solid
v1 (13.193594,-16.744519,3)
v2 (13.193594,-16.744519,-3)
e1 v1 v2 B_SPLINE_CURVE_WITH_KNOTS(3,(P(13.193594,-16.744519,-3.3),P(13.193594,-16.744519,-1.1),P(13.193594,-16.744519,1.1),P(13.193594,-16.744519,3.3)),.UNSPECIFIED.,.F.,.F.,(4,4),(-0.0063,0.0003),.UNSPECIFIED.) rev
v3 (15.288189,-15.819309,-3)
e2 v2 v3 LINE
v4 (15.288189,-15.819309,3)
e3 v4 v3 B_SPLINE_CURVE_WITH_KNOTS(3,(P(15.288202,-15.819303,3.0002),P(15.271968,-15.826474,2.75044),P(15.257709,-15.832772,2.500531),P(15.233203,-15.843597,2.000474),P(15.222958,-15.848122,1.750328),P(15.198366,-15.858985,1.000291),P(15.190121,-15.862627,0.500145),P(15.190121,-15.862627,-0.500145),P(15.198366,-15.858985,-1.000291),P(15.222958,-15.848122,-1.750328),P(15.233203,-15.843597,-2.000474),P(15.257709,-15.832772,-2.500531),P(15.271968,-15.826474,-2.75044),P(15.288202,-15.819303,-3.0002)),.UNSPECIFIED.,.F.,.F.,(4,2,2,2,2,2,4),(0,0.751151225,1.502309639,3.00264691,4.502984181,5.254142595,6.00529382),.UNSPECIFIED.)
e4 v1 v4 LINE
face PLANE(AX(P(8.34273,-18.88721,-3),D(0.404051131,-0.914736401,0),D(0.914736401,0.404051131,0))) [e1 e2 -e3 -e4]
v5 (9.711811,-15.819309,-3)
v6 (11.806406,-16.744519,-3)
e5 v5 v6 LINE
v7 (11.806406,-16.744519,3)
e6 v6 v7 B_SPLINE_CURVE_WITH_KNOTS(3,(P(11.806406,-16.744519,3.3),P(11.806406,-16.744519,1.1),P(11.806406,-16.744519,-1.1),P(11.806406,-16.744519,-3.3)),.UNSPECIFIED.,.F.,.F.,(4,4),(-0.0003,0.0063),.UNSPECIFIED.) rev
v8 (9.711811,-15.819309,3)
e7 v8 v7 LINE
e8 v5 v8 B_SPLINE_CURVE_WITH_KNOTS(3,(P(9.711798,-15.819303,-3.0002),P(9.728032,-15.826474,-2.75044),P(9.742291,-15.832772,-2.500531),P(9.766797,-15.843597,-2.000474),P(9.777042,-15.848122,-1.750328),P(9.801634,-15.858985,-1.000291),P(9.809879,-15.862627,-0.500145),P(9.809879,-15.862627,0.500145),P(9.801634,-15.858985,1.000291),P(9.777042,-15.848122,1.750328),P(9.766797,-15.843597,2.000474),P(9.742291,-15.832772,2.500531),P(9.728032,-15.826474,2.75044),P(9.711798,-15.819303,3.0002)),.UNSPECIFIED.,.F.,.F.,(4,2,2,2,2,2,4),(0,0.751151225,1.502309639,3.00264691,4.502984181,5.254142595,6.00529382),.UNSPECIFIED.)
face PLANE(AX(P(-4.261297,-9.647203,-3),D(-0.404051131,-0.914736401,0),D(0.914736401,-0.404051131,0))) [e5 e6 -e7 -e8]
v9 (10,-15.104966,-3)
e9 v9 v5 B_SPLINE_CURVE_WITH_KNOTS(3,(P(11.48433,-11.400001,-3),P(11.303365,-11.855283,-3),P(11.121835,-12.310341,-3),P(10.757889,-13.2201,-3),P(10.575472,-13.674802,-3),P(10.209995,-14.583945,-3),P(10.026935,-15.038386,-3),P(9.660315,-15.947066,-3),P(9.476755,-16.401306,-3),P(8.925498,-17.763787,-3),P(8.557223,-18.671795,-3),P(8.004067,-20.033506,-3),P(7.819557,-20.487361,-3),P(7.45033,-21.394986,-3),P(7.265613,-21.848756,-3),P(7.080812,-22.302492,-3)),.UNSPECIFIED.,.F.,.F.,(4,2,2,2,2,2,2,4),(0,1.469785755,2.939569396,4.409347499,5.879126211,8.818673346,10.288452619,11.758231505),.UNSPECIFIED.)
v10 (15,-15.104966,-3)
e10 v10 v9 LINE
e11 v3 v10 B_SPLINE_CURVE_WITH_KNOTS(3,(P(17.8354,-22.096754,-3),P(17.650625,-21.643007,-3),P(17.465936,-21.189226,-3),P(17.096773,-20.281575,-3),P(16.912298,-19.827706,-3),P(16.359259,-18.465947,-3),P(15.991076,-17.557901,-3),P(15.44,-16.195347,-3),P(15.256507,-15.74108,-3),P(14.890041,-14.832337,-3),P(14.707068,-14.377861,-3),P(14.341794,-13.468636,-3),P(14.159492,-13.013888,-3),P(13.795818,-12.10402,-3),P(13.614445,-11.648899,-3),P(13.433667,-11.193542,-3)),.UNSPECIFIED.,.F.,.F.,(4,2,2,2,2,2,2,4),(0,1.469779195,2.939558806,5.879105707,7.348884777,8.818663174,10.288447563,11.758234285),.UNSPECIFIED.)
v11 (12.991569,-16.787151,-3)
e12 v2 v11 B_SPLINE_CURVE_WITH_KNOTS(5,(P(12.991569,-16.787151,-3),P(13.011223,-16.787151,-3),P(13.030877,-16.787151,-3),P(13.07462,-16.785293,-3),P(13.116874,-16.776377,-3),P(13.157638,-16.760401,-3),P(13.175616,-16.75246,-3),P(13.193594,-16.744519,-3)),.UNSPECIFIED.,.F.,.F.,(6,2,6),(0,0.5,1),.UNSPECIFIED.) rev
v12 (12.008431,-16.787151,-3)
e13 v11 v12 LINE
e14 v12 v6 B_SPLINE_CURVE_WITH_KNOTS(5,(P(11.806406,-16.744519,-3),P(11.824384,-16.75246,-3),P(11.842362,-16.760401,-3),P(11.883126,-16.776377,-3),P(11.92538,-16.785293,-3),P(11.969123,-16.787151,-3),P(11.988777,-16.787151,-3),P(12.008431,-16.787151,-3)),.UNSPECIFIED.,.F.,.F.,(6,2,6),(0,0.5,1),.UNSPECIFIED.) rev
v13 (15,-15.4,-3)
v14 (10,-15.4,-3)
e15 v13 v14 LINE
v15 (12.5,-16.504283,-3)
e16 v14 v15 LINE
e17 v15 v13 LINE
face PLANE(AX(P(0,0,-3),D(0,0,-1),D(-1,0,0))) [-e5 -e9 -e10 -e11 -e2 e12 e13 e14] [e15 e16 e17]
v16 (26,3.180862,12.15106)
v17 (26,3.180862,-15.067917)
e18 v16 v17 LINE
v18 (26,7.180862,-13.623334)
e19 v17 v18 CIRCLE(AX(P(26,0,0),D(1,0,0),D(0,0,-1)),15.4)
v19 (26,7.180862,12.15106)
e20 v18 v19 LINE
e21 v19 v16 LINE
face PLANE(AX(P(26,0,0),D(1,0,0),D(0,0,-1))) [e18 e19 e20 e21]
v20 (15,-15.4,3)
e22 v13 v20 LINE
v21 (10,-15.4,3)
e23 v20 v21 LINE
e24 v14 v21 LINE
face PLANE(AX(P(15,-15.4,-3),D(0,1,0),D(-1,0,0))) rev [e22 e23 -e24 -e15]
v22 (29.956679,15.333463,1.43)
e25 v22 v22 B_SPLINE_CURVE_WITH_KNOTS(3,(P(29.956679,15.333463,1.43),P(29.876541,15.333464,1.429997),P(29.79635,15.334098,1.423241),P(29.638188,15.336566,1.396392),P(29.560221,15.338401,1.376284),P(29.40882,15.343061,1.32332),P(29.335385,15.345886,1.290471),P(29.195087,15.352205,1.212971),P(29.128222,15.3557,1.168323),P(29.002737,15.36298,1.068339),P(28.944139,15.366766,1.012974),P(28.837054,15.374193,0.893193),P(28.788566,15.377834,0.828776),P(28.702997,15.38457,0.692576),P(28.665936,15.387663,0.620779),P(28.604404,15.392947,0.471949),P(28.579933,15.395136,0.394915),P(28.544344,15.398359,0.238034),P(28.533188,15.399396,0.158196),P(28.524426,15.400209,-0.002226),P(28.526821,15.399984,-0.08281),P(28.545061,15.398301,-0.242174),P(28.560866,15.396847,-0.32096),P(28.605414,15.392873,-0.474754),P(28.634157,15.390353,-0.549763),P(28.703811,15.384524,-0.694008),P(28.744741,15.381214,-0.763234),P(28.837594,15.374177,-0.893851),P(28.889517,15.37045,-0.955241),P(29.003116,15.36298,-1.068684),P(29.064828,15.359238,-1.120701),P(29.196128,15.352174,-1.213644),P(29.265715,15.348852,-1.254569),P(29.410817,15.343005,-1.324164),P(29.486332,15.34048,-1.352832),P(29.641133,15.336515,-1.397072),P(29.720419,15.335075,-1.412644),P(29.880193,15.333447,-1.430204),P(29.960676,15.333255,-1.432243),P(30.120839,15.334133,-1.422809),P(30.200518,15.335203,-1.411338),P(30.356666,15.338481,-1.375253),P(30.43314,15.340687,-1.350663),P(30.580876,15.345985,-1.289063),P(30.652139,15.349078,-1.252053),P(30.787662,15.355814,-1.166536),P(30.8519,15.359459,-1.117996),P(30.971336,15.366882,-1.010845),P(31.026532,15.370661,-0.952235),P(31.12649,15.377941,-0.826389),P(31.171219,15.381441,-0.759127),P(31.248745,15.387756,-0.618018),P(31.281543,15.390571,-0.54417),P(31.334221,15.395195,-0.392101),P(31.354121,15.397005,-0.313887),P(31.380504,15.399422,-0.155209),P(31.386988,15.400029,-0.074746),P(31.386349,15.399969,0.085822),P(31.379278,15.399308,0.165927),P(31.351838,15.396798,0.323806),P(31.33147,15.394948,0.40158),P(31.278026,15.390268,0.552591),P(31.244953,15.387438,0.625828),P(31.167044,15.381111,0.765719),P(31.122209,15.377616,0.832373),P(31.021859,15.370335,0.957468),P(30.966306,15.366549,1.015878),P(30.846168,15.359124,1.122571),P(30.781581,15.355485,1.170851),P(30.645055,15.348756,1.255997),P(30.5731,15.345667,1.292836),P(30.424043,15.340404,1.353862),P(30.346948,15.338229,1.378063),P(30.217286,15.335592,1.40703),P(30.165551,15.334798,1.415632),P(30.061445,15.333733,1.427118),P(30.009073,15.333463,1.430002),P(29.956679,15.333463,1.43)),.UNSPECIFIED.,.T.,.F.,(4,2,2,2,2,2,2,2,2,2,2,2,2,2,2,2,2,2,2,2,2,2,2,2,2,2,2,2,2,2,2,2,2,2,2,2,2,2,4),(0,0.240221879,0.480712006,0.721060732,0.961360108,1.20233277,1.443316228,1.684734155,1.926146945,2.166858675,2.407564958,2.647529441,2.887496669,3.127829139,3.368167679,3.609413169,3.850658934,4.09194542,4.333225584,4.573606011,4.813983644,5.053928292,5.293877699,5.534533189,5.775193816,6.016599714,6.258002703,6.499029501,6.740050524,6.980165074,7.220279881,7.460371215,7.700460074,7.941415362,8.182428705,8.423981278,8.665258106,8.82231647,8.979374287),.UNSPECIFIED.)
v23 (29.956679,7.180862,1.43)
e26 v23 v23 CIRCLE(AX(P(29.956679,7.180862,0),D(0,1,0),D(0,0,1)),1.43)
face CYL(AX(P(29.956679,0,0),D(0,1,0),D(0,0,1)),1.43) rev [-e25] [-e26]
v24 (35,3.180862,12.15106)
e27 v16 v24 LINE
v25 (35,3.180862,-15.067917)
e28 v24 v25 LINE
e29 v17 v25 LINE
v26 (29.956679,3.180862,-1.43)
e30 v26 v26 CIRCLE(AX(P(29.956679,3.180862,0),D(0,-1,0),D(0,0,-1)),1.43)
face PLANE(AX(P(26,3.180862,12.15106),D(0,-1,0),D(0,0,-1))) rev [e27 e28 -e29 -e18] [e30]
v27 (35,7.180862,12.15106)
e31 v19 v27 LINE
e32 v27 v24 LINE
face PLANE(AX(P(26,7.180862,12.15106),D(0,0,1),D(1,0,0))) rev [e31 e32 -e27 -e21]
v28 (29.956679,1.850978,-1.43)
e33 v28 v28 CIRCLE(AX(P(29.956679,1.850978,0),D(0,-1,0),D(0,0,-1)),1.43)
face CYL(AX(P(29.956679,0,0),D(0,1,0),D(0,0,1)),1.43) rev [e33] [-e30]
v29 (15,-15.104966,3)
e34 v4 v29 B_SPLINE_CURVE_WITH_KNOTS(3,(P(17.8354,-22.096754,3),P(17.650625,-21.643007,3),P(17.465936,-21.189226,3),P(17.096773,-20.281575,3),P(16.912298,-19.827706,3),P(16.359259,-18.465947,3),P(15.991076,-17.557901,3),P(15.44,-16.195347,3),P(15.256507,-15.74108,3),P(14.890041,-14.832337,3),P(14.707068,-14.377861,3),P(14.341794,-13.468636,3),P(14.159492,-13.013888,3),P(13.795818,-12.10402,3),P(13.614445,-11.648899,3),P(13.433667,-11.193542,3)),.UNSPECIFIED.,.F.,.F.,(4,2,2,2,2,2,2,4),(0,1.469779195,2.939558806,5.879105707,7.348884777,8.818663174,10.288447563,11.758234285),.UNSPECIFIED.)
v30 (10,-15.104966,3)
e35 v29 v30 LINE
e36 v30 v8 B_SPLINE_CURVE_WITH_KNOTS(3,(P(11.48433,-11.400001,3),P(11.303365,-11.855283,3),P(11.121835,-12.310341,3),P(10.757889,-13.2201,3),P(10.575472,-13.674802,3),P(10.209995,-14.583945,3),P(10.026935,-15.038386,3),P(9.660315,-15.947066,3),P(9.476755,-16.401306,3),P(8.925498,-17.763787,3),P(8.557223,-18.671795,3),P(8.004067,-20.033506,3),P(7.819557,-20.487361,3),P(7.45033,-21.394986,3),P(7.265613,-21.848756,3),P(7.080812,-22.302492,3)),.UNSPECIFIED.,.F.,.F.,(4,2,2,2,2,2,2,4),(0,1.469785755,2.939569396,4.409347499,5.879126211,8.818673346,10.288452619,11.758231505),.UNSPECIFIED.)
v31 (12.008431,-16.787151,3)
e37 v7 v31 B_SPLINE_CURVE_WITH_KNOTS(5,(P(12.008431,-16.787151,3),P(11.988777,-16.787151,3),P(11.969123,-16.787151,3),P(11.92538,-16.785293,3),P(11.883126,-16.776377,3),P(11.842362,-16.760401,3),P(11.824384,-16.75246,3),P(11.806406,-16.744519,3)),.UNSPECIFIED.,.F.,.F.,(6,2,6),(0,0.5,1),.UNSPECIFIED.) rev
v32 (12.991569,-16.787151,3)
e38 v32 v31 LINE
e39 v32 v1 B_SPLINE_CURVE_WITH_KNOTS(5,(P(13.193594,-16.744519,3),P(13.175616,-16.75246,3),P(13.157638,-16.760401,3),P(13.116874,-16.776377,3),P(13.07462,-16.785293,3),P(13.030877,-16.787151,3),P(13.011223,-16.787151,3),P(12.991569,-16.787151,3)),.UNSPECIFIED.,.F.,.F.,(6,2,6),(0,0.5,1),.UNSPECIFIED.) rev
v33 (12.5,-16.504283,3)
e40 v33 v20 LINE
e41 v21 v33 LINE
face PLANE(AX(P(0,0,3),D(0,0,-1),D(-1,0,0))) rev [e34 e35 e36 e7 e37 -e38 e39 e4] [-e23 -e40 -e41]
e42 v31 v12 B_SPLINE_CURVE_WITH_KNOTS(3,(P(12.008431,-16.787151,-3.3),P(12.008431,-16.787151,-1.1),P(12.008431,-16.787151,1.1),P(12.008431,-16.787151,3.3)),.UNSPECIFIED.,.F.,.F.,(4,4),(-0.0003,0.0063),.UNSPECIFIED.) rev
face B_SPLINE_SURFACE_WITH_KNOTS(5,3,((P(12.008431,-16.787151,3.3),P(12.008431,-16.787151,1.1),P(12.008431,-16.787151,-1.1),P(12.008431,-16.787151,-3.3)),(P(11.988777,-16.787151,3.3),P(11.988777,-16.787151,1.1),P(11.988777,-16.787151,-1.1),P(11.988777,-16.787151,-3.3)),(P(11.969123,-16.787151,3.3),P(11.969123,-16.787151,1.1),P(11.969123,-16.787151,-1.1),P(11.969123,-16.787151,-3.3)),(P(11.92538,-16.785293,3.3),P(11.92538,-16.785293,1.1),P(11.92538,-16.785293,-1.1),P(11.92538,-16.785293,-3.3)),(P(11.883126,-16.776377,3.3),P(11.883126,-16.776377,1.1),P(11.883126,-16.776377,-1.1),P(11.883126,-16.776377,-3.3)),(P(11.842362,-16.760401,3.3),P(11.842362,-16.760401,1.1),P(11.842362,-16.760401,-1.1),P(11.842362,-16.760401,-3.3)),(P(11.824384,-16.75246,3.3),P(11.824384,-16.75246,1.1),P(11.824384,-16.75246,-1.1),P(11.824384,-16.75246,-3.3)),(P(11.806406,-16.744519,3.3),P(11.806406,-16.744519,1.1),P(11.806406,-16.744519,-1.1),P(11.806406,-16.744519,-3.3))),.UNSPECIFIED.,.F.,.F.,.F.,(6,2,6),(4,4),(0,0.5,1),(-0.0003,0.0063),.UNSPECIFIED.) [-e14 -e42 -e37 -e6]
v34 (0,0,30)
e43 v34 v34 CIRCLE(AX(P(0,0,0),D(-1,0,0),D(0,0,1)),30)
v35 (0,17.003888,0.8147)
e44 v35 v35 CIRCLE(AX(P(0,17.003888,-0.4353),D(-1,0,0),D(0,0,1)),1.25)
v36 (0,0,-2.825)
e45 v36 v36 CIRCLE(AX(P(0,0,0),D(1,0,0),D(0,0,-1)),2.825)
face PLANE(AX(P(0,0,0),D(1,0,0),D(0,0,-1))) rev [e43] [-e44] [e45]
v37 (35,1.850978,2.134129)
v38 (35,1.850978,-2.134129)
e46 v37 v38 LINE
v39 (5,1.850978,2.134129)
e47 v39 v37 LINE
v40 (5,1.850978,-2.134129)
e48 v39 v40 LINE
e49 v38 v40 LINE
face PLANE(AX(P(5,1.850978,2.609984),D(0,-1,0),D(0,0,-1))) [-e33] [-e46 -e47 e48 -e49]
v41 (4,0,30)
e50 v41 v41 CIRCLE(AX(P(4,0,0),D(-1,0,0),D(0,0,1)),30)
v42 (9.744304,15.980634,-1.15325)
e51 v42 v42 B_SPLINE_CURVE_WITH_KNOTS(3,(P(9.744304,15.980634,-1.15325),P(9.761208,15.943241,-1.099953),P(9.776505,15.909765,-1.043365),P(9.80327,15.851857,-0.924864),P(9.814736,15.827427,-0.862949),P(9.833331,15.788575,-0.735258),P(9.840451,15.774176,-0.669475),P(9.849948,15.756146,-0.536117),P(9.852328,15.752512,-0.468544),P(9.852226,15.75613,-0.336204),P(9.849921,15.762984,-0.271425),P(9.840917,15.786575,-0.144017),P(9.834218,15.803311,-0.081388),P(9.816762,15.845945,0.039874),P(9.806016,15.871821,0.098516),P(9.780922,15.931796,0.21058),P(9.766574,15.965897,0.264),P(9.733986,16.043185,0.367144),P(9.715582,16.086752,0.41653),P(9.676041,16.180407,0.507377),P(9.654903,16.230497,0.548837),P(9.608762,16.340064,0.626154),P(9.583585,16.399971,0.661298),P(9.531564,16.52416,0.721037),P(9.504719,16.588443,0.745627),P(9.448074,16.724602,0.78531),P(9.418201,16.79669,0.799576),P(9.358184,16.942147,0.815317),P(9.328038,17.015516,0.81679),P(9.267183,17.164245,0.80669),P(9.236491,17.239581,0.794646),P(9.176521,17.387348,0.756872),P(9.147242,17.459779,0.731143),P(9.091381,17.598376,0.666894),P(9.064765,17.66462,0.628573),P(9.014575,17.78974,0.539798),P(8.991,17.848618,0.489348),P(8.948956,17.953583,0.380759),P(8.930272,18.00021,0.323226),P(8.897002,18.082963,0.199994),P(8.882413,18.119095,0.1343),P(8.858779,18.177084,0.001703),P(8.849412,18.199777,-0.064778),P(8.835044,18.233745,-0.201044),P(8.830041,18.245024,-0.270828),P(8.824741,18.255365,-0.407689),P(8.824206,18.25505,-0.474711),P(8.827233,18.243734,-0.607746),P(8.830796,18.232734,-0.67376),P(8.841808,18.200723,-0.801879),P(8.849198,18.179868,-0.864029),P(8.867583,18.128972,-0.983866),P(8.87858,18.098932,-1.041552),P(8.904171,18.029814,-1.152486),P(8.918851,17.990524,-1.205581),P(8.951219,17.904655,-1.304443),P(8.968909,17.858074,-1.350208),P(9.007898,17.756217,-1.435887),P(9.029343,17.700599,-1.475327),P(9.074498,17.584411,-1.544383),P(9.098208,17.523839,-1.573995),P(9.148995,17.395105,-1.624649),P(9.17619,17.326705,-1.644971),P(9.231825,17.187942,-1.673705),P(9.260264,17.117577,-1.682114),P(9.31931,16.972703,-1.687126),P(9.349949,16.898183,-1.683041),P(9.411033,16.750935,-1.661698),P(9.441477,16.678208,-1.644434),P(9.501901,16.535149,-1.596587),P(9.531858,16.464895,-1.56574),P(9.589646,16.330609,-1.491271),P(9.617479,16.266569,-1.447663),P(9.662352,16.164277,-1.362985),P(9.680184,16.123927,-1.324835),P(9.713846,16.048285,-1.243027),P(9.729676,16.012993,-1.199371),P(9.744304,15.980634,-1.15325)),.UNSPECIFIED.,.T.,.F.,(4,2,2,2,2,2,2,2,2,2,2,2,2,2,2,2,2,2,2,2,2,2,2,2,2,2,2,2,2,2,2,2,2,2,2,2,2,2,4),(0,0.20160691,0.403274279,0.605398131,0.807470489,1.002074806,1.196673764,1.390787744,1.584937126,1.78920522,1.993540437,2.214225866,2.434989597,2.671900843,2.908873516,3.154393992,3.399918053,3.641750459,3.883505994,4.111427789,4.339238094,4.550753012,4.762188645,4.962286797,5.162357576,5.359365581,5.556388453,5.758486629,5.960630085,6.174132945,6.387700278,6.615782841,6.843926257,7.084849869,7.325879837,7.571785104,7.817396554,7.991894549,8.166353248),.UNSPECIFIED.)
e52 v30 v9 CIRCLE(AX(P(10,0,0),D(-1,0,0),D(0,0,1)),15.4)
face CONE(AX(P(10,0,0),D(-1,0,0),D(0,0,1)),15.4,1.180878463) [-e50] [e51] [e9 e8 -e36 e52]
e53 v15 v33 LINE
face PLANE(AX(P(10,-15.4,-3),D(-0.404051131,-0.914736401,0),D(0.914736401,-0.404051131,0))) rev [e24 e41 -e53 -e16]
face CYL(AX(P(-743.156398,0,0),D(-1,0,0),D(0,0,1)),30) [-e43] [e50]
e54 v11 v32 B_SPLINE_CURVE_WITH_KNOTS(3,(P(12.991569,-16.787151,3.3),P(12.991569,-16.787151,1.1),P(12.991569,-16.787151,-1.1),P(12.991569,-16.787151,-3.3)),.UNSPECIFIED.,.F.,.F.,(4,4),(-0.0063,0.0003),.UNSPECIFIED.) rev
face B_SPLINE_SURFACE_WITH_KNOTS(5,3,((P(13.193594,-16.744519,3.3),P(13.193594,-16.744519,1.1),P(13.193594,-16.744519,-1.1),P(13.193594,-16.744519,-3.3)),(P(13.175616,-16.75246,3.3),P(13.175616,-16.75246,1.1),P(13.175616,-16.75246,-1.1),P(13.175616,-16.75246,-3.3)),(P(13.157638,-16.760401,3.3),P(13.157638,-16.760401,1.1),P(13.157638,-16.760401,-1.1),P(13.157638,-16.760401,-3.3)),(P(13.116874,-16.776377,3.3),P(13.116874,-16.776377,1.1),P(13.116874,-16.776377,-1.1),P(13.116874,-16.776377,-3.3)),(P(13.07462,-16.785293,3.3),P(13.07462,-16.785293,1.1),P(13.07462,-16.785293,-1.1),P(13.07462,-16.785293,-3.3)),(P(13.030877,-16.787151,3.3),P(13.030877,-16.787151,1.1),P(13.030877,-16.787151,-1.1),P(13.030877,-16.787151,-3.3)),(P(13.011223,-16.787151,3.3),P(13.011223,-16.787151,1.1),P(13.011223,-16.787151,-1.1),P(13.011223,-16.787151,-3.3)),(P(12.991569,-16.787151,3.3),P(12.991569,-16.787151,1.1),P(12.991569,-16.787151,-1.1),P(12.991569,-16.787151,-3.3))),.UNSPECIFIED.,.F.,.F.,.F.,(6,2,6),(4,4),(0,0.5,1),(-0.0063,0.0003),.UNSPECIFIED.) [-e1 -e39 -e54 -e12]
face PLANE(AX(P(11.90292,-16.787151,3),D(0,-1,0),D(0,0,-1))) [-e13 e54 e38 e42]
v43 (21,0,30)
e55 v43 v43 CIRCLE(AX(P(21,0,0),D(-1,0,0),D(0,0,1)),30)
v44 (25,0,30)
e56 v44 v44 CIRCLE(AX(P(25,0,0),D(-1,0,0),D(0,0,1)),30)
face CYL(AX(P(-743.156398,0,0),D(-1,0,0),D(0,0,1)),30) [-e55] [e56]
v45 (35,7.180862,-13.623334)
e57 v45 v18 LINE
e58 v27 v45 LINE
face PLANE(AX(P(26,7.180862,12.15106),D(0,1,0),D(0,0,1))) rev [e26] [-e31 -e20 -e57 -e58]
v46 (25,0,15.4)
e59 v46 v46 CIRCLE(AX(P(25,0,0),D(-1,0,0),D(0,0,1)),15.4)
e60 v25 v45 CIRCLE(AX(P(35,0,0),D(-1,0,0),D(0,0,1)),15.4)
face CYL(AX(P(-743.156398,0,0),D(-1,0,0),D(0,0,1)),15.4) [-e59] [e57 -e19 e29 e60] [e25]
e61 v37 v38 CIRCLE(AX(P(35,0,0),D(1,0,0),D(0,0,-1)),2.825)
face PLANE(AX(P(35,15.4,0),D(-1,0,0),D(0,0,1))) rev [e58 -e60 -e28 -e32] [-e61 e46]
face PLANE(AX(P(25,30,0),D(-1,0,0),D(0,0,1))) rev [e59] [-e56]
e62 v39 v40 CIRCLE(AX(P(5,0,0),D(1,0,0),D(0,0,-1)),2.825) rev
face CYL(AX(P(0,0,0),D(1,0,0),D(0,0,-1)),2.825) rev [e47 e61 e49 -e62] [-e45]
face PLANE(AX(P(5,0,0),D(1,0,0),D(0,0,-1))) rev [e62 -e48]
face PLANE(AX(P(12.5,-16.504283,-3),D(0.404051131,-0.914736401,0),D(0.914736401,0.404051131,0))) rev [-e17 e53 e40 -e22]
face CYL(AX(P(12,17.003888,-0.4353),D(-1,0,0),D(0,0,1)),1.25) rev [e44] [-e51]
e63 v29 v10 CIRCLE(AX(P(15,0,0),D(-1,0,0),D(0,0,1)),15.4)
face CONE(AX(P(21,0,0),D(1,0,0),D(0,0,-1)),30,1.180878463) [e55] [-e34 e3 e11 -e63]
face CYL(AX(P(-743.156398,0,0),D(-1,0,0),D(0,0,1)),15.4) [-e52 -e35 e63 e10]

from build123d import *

# Parameters (mm, degrees)
SKETCH_3_R                = 2.825
CUT_EXTRUDE_2_DEPTH       = 35
SKETCH_14_R               = 1.25
CUT_EXTRUDE_5_DEPTH       = 12
SKETCH_16_W               = 5.008881277
SKETCH_16_H               = 1
EXTRUDE_2_DEPTH           = 30
SKETCH_19_W               = 0.959066555
SKETCH_19_H               = 0.511502163
EXTRUDE_3_DEPTH           = 30
SKETCH_24_W               = 27.218976977
SKETCH_24_H               = 4
CUT_EXTRUDE_8_DEPTH       = 9
SKETCH_25_R               = 1.43
CUT_EXTRUDE_9_DEPTH       = 22
EXTRUDE_4_DEPTH           = 3
EXTRUDE_4_DEPTH_BACK      = 3
CUT_EXTRUDE_12_DEPTH      = 3
CUT_EXTRUDE_12_DEPTH_BACK = 3


with BuildPart() as part:
    # 草圖1 → 旋轉1 (revolve)
    with BuildSketch(Plane.XY, mode=Mode.PRIVATE) as revolve_1_sk:
        Polygon((0, 0), (0, 30), (4, 30), (10, 15.4), (15, 15.4), (21, 30), (25, 30), (25, 15.4), (35, 15.4), (35, 0), align=None)
    revolve(revolve_1_sk.sketch.rotate(Axis((-743.15639781, 0, 0), (1, 0, 0)), 90), axis=Axis((-743.15639781, 0, 0), (1, 0, 0)))

    # 草圖3 → 除料-伸長2 (cut)
    with BuildSketch(Plane(origin=(35, 0, 0), x_dir=(0, 0, -1), z_dir=(1, 0, 0))):
        Circle(SKETCH_3_R)
    extrude(amount=-CUT_EXTRUDE_2_DEPTH, mode=Mode.SUBTRACT)

    # 草圖14 → 除料-伸長5 (cut)
    with BuildSketch(Plane.ZY):
        with Locations((-0.435299539, 17.00388826)):
            Circle(SKETCH_14_R)
    extrude(amount=-CUT_EXTRUDE_5_DEPTH, mode=Mode.SUBTRACT)

    # 草圖16 → 填料-伸長2 (add)
    with BuildSketch(Plane(origin=(35, 0, 0), x_dir=(0, 0, -1), z_dir=(1, 0, 0))):
        with Locations((-0.105543204, 2.350977924)):
            Rectangle(SKETCH_16_W, SKETCH_16_H)
    extrude(amount=-EXTRUDE_2_DEPTH)

    # 草圖19 → 填料-伸長3 (add)
    with BuildSketch(Plane(origin=(35, 0, 0), x_dir=(0, 0, -1), z_dir=(1, 0, 0))):
        with Locations((-0.084116996, 2.673942601)):
            Rectangle(SKETCH_19_W, SKETCH_19_H)
    extrude(amount=-EXTRUDE_3_DEPTH)

    # 草圖24 → 除料-伸長8 (cut)
    with BuildSketch(Plane(origin=(35, 0, 0), x_dir=(0, 0, -1), z_dir=(1, 0, 0))):
        with Locations((1.458428344, 5.180861889)):
            Rectangle(SKETCH_24_W, SKETCH_24_H)
    extrude(amount=-CUT_EXTRUDE_8_DEPTH, mode=Mode.SUBTRACT)

    # 草圖25 → 除料-伸長9 (cut)
    with BuildSketch(Plane(origin=(0, 22, 0), x_dir=(1, 0, 0), z_dir=(0, 1, 0))):
        with Locations(Location((29.956679037, 0, 0), (0, 0, 90))):
            Circle(SKETCH_25_R)
    extrude(amount=-CUT_EXTRUDE_9_DEPTH, mode=Mode.SUBTRACT)

    # 草圖35 → 伸長-薄件4 (add, two sides: drawn at the far end of the back side and taken through both)
    with BuildSketch(Plane.XY.offset(-EXTRUDE_4_DEPTH_BACK)):
        Polygon((17.369423388, -14.9), (7.630576612, -14.9), (12.5, -17.050888526), align=None)
        Polygon((15, -15.4), (10, -15.4), (12.5, -16.504282968), align=None, mode=Mode.SUBTRACT)
    extrude(amount=EXTRUDE_4_DEPTH + EXTRUDE_4_DEPTH_BACK)

    # 草圖36 → 除料-伸長12 (cut, two sides: drawn at the far end of the back side and taken through both)
    with BuildSketch(Plane.XY.offset(-CUT_EXTRUDE_12_DEPTH_BACK)):
        Polygon((11.902920357, -16.787150573), (13.343105155, -16.787150573), (13.343105155, -17.362903865), (11.859661783, -17.362903865), align=None)
    extrude(amount=CUT_EXTRUDE_12_DEPTH + CUT_EXTRUDE_12_DEPTH_BACK, mode=Mode.SUBTRACT)

    # 圓角14
    # a fillet whose section is not a circle: 0.5 mm, written as the material it takes off along each edge
    with BuildSketch(Plane(origin=(11.902920357, -16.787150573, -3.263777256), x_dir=(-0.9147364009889508, 0.4040511313012026, 0), z_dir=(0, 0, 1))) as fillet_14_piece_1:
        with BuildLine():
            add(Edge.make_bspline([(0.105510902, 0), (0.085856889, 0), (0.066202875, 0), (0.022459615, -0.001857581), (-0.01979407, -0.01077403), (-0.060558179, -0.026749346), (-0.078536421, -0.034690573), (-0.096514663, -0.0426318)], knots=[0, 0, 0, 0, 0, 0, 0.5, 0.5, 1, 1, 1, 1, 1, 1], degree=5))
            Line((-0.096514663, -0.0426318), (0, 0))
            Line((0, 0), (0.105510902, 0))
        make_face()
    extrude(amount=6.527554512, mode=Mode.SUBTRACT)
    with BuildSketch(Plane(origin=(13.097079643, -16.787150573, 3.263777256), x_dir=(-1, 0, 0), z_dir=(0, 0, -1))) as fillet_14_piece_2:
        with BuildLine():
            add(Edge.make_bspline([(0.105510902, 0), (0.085856889, 0), (0.066202875, 0), (0.022459615, 0.001857581), (-0.01979407, 0.01077403), (-0.060558179, 0.026749346), (-0.078536421, 0.034690573), (-0.096514663, 0.0426318)], knots=[0, 0, 0, 0, 0, 0, 0.5, 0.5, 1, 1, 1, 1, 1, 1], degree=5))
            Line((-0.096514663, 0.0426318), (0, 0))
            Line((0, 0), (0.105510902, 0))
        make_face()
    extrude(amount=6.527554512, mode=Mode.SUBTRACT)


solid = part.part
